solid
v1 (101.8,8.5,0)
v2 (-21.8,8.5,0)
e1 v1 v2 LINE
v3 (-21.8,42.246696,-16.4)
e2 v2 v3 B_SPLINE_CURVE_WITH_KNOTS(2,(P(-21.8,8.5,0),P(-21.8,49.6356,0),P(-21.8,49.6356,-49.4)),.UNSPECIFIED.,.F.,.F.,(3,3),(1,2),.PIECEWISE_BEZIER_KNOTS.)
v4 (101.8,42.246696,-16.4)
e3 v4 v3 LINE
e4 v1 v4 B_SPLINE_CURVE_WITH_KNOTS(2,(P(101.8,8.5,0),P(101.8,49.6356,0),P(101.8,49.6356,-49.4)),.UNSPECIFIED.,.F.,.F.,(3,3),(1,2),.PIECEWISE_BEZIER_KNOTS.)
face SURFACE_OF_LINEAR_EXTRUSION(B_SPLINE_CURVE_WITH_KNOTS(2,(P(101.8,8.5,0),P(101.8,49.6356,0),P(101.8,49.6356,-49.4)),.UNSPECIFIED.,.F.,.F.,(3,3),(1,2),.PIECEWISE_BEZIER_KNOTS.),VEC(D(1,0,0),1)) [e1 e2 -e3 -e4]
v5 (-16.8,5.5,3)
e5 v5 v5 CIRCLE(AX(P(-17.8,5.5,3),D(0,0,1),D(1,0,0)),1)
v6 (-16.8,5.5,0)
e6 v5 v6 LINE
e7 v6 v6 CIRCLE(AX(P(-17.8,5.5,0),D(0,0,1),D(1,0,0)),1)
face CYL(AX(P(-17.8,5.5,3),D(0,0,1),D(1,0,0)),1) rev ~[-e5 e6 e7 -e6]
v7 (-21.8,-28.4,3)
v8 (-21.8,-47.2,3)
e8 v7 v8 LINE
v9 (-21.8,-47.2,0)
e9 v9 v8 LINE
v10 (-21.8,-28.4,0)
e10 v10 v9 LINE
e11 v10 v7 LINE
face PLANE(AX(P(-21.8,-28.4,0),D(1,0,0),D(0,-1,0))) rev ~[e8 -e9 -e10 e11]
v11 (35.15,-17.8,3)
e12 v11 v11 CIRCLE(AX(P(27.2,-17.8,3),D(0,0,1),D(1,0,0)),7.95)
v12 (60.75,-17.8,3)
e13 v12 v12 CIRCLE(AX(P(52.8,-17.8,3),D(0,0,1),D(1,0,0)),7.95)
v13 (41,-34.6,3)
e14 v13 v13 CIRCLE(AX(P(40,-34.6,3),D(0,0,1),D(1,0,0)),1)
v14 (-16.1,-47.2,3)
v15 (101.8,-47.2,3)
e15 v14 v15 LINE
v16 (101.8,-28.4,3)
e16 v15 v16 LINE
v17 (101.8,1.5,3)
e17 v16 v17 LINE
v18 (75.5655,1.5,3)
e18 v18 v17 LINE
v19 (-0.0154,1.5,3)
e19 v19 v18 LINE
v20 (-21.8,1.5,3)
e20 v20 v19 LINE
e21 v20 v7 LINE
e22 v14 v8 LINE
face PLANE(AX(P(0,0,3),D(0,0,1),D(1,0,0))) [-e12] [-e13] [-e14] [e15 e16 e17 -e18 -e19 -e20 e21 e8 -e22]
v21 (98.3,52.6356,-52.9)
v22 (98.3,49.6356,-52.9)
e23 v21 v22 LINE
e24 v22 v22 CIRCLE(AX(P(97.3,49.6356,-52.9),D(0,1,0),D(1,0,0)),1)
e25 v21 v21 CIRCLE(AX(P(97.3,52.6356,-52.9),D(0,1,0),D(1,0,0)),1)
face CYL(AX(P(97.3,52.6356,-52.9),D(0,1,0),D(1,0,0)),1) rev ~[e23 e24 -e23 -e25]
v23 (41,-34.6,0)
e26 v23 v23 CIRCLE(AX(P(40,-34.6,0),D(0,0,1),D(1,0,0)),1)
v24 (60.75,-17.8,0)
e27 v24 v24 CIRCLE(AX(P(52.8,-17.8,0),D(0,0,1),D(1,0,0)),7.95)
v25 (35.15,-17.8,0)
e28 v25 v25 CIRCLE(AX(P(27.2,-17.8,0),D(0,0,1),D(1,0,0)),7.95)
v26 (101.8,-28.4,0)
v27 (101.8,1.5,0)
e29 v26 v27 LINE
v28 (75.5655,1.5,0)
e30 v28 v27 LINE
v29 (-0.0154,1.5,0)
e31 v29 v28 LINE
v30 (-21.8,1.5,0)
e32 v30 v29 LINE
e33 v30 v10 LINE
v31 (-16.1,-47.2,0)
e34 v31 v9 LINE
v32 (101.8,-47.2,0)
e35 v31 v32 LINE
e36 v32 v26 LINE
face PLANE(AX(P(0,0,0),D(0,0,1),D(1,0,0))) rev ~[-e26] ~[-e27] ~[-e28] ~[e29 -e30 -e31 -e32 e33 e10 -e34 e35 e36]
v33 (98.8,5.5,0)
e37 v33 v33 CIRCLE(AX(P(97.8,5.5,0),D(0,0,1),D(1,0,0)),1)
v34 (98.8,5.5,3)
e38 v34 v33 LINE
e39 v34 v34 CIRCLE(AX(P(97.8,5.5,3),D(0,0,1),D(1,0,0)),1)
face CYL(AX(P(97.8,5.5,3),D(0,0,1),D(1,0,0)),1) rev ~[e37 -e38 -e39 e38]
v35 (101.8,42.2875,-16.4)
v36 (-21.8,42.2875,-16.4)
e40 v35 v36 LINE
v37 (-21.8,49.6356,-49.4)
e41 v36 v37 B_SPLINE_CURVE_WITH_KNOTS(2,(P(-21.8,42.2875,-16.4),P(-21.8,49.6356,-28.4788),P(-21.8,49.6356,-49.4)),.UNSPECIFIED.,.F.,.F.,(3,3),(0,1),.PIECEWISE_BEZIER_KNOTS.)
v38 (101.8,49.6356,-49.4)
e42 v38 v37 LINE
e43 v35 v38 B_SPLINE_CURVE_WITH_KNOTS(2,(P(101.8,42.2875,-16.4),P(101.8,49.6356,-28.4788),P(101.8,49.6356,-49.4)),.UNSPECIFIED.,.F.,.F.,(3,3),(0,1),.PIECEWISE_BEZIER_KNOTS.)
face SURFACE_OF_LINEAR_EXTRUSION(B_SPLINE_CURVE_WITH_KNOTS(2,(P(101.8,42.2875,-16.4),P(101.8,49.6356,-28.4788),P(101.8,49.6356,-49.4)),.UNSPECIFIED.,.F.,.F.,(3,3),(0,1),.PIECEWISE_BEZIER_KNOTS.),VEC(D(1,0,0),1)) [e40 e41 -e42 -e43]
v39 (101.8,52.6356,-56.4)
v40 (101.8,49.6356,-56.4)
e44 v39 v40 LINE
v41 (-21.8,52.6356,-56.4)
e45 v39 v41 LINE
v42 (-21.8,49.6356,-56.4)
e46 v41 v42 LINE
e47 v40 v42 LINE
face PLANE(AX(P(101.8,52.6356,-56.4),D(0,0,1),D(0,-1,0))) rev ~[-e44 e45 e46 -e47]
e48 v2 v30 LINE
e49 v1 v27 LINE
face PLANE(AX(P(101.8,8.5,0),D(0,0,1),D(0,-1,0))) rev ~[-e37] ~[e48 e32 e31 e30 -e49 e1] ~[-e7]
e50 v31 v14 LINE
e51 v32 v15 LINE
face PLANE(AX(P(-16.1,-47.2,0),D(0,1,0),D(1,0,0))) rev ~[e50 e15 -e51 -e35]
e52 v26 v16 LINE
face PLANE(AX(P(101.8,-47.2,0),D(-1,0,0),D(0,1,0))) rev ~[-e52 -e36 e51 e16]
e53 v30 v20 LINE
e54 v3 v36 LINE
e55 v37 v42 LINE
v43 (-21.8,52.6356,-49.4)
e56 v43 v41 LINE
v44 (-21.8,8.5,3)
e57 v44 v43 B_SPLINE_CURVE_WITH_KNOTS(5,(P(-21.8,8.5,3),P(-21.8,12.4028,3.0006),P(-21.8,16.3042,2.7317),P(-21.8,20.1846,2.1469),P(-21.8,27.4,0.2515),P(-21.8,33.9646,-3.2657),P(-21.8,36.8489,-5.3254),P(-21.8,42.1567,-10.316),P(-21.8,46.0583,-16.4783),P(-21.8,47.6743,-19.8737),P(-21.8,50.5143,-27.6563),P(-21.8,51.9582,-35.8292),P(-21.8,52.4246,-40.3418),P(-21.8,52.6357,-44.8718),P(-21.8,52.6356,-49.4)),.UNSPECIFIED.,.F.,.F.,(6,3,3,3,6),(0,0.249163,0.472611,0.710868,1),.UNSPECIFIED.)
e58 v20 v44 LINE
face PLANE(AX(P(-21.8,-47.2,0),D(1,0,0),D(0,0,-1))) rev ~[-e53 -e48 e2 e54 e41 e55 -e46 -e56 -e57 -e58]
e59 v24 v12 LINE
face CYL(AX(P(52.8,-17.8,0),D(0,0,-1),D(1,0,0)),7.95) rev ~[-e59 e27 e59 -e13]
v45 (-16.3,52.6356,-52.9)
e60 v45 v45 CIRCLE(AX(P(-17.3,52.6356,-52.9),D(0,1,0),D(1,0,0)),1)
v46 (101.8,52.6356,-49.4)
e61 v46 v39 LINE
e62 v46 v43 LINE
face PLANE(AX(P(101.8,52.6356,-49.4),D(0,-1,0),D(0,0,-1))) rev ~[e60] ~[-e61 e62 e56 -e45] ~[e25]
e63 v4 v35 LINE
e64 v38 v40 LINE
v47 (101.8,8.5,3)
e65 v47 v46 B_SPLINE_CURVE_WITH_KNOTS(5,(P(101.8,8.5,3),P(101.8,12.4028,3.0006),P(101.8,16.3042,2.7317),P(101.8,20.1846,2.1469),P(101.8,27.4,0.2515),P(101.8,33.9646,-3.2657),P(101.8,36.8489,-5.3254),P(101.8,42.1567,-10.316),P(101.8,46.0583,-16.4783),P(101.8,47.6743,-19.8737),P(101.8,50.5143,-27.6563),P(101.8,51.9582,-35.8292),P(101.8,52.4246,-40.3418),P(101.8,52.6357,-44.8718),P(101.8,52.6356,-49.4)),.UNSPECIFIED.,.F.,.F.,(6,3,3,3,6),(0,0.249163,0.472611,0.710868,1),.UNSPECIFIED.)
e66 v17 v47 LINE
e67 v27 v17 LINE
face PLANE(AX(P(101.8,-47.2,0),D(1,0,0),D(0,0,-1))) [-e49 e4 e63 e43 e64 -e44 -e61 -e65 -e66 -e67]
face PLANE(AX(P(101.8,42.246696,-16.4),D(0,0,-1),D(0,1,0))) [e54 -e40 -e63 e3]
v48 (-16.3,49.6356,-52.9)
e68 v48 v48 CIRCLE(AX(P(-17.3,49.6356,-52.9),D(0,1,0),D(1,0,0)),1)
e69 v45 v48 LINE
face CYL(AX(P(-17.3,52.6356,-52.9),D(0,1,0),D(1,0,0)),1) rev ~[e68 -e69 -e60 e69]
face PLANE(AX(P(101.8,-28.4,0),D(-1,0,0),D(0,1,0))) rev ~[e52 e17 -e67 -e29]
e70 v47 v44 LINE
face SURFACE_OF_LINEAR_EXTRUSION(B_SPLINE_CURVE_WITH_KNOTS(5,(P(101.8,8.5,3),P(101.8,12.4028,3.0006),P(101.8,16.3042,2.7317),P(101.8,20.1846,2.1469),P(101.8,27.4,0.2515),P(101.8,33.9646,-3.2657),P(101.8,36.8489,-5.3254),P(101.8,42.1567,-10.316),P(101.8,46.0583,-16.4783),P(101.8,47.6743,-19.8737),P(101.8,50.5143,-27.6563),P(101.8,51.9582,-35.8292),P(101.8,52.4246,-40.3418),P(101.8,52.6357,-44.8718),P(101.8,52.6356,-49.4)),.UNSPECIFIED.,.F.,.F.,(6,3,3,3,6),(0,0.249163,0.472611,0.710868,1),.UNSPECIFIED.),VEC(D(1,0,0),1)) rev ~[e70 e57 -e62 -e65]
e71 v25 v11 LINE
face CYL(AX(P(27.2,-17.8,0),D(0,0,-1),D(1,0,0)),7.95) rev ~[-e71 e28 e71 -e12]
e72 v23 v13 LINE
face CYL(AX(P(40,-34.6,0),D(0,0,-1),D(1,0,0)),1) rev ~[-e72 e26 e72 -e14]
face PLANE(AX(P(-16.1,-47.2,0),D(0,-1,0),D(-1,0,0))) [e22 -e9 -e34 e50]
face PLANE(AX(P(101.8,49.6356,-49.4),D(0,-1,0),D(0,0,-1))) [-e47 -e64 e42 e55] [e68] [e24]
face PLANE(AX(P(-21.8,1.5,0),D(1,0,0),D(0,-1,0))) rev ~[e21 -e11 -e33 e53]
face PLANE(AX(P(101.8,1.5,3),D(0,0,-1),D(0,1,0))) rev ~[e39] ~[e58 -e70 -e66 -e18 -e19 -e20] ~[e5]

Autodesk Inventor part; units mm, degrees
ref_plane "YZ Plane" through (0, 0, 0) normal (1, 0, 0) x (0, 1, 0)
ref_plane "XZ Plane" through (0, 0, 0) normal (0, 1, 0) x (-1, 0, 0)
ref_plane "XY Plane" through (0, 0, 0) normal (0, 0, 1) x (1, 0, 0)
sketch "Esboço1" plane through (0, 0, 0) normal (0, 0, 1) x (1, 0, 0)
  line L0 (-21.8, -28.4) -> (-21.8, -58.8) projected
  line L1 (-16.1, -47.2) -> (-23.9, -47.2) projected
  line L2 (-26.1, 49.6356) -> (-29.1, 49.6356) projected
  line L3 (-21.8, -47.2) -> (101.8, -47.2)
  line L4 (101.8, -47.2) -> (101.8, 49.6356)
  line L5 (101.8, 49.6356) -> (-21.8, 49.6356)
  line L6 (-21.8, 49.6356) -> (-21.8, -47.2)
  line L7 (101.8, -28.4) -> (101.8, -58.8) projected
  circle A0 centre (27.2, -17.8) radius 7.95 projected
  circle A1 centre (52.8, -17.8) radius 7.95 projected
  circle A2 centre (40, -34.6) radius 1 projected
  line L8 (-0.0154, 1.5) -> (75.5655, 1.5) projected
  line L9 (75.5655, 1.5) -> (106.1, 1.5) projected
  line L10 (-26.1, 1.5) -> (-0.0154, 1.5) projected
  point P0 (0, 0)
  point P1 (-21.8, 1.5)
  point P2 (101.8, 1.5)
  dimension "d0" = 0
extrude "Extrusão1" add sketch "Esboço1" along normal blind 3 contours L6 L10 L8 L9 L4 L3 L1 L0
sketch "Esboço2" plane through (101.8, -47.2, 0) normal (1, 0, 0) x (0, 0, -1)
  line L0 (0, 48.7) -> (0, 0)
  line L1 (0, 48.7) -> (-3, 48.7)
  line L2 (-3, 48.7) -> (-3, 55.7)
  line L3 (-3, 55.7) -> (0, 55.7)
  line L4 (0, 55.7) -> (0, 48.7)
  line L5 (16.4, 7.2) -> (16.4, 89.4875)
  line L6 (67.3088, 7.2) -> (16.4, 7.2)
  line L7 (57.4544, 17.0544) -> (67.3088, 7.2)
  arc A0 (56.4, 19.6) -> (57.4544, 17.0544) centre (60, 19.6) ccw
  line L8 (56.4, 35.6) -> (56.4, 19.6)
  arc A1 (63.6, 35.6) -> (56.4, 35.6) centre (60, 35.6) ccw
  line L9 (63.6, 21.0912) -> (63.6, 35.6)
  line L10 (77.4912, 7.2) -> (63.6, 21.0912)
  line L11 (109.9, 7.2) -> (77.4912, 7.2)
  line L12 (109.9, 77.4021) -> (109.9, 7.2)
  line L13 (53.4, 87.3646) -> (109.9, 77.4021)
  line L14 (53.4, 90.3646) -> (53.4, 87.3646)
  line L15 (56.4, 90.3646) -> (53.4, 90.3646)
  line L16 (56.4, 96.8356) -> (56.4, 90.3646)
  line L17 (49.4, 96.8356) -> (56.4, 96.8356)
  spline S0 degree 2 poles (16.4, 89.4875) (28.4788, 96.8356) (49.4, 96.8356) knots 0 0 0 1 1 1
  circle A2 centre (49.1, 41) radius 0.8
  line L18 (0, 55.7) -> (0, 96.8356) construction
  line L19 (0, 96.8356) -> (49.4, 96.8356) construction
  spline S1 degree 2 poles (0, 55.7) (0, 96.8356) (49.4, 96.8356) knots 1 1 1 2 2 2
  line L20 (49.4, 99.8356) -> (56.4, 99.8356)
  line L21 (56.4, 99.8356) -> (56.4, 96.8356)
  line L22 (56.4, 96.8356) -> (49.4, 96.8356)
  line L23 (49.4, 96.8356) -> (49.4, 99.8356)
  spline S2 degree 5 poles (-3, 55.7) (-3.0006, 59.6028) (-2.7317, 63.5042) (-2.1469, 67.3846) (-0.2515, 74.6) (3.2657, 81.1646) (5.3254, 84.0489) (10.316, 89.3567) (16.4783, 93.2583) (19.8737, 94.8743) (27.6563, 97.7143) (35.8292, 99.1582) (40.3418, 99.6246) (44.8718, 99.8357) (49.4, 99.8356) knots 0 0 0 0 0 0 0.249163 0.249163 0.249163 0.472611 0.472611 0.472611 0.710868 0.710868 0.710868 1 1 1 1 1 1
  point P0 (0, 47.2)
  point P1 (16.4, 89.4467)
  dimension "d3" = 7
extrude "Extrusão2" add sketch "Esboço2" against normal blind 123.6 contours L1 L2 L3 L4 | L3 S2 L23 S0 L5 S1 | L20 L21 L17 L23
sketch "Esboço3" plane through (0, 0, 3) normal (0, 0, 1) x (1, 0, 0)
  circle A0 centre (-17.8, 5.5) radius 1 projected
  circle A1 centre (97.8, 5.5) radius 1 projected
  point P0 (0, 0)
extrude "Extrusão3" cut sketch "Esboço3" against normal blind 6
sketch "Esboço4" plane through (101.8, 52.6356, -49.4) normal (0, 1, 0) x (1, 0, 0)
  circle A0 centre (-119.1, 3.5) radius 1 projected
  circle A1 centre (-4.5, 3.5) radius 1 projected
  point P0 (-101.8, -49.4)
extrude "Extrusão4" cut sketch "Esboço4" against normal blind 6
properties part number "frente recurva"
